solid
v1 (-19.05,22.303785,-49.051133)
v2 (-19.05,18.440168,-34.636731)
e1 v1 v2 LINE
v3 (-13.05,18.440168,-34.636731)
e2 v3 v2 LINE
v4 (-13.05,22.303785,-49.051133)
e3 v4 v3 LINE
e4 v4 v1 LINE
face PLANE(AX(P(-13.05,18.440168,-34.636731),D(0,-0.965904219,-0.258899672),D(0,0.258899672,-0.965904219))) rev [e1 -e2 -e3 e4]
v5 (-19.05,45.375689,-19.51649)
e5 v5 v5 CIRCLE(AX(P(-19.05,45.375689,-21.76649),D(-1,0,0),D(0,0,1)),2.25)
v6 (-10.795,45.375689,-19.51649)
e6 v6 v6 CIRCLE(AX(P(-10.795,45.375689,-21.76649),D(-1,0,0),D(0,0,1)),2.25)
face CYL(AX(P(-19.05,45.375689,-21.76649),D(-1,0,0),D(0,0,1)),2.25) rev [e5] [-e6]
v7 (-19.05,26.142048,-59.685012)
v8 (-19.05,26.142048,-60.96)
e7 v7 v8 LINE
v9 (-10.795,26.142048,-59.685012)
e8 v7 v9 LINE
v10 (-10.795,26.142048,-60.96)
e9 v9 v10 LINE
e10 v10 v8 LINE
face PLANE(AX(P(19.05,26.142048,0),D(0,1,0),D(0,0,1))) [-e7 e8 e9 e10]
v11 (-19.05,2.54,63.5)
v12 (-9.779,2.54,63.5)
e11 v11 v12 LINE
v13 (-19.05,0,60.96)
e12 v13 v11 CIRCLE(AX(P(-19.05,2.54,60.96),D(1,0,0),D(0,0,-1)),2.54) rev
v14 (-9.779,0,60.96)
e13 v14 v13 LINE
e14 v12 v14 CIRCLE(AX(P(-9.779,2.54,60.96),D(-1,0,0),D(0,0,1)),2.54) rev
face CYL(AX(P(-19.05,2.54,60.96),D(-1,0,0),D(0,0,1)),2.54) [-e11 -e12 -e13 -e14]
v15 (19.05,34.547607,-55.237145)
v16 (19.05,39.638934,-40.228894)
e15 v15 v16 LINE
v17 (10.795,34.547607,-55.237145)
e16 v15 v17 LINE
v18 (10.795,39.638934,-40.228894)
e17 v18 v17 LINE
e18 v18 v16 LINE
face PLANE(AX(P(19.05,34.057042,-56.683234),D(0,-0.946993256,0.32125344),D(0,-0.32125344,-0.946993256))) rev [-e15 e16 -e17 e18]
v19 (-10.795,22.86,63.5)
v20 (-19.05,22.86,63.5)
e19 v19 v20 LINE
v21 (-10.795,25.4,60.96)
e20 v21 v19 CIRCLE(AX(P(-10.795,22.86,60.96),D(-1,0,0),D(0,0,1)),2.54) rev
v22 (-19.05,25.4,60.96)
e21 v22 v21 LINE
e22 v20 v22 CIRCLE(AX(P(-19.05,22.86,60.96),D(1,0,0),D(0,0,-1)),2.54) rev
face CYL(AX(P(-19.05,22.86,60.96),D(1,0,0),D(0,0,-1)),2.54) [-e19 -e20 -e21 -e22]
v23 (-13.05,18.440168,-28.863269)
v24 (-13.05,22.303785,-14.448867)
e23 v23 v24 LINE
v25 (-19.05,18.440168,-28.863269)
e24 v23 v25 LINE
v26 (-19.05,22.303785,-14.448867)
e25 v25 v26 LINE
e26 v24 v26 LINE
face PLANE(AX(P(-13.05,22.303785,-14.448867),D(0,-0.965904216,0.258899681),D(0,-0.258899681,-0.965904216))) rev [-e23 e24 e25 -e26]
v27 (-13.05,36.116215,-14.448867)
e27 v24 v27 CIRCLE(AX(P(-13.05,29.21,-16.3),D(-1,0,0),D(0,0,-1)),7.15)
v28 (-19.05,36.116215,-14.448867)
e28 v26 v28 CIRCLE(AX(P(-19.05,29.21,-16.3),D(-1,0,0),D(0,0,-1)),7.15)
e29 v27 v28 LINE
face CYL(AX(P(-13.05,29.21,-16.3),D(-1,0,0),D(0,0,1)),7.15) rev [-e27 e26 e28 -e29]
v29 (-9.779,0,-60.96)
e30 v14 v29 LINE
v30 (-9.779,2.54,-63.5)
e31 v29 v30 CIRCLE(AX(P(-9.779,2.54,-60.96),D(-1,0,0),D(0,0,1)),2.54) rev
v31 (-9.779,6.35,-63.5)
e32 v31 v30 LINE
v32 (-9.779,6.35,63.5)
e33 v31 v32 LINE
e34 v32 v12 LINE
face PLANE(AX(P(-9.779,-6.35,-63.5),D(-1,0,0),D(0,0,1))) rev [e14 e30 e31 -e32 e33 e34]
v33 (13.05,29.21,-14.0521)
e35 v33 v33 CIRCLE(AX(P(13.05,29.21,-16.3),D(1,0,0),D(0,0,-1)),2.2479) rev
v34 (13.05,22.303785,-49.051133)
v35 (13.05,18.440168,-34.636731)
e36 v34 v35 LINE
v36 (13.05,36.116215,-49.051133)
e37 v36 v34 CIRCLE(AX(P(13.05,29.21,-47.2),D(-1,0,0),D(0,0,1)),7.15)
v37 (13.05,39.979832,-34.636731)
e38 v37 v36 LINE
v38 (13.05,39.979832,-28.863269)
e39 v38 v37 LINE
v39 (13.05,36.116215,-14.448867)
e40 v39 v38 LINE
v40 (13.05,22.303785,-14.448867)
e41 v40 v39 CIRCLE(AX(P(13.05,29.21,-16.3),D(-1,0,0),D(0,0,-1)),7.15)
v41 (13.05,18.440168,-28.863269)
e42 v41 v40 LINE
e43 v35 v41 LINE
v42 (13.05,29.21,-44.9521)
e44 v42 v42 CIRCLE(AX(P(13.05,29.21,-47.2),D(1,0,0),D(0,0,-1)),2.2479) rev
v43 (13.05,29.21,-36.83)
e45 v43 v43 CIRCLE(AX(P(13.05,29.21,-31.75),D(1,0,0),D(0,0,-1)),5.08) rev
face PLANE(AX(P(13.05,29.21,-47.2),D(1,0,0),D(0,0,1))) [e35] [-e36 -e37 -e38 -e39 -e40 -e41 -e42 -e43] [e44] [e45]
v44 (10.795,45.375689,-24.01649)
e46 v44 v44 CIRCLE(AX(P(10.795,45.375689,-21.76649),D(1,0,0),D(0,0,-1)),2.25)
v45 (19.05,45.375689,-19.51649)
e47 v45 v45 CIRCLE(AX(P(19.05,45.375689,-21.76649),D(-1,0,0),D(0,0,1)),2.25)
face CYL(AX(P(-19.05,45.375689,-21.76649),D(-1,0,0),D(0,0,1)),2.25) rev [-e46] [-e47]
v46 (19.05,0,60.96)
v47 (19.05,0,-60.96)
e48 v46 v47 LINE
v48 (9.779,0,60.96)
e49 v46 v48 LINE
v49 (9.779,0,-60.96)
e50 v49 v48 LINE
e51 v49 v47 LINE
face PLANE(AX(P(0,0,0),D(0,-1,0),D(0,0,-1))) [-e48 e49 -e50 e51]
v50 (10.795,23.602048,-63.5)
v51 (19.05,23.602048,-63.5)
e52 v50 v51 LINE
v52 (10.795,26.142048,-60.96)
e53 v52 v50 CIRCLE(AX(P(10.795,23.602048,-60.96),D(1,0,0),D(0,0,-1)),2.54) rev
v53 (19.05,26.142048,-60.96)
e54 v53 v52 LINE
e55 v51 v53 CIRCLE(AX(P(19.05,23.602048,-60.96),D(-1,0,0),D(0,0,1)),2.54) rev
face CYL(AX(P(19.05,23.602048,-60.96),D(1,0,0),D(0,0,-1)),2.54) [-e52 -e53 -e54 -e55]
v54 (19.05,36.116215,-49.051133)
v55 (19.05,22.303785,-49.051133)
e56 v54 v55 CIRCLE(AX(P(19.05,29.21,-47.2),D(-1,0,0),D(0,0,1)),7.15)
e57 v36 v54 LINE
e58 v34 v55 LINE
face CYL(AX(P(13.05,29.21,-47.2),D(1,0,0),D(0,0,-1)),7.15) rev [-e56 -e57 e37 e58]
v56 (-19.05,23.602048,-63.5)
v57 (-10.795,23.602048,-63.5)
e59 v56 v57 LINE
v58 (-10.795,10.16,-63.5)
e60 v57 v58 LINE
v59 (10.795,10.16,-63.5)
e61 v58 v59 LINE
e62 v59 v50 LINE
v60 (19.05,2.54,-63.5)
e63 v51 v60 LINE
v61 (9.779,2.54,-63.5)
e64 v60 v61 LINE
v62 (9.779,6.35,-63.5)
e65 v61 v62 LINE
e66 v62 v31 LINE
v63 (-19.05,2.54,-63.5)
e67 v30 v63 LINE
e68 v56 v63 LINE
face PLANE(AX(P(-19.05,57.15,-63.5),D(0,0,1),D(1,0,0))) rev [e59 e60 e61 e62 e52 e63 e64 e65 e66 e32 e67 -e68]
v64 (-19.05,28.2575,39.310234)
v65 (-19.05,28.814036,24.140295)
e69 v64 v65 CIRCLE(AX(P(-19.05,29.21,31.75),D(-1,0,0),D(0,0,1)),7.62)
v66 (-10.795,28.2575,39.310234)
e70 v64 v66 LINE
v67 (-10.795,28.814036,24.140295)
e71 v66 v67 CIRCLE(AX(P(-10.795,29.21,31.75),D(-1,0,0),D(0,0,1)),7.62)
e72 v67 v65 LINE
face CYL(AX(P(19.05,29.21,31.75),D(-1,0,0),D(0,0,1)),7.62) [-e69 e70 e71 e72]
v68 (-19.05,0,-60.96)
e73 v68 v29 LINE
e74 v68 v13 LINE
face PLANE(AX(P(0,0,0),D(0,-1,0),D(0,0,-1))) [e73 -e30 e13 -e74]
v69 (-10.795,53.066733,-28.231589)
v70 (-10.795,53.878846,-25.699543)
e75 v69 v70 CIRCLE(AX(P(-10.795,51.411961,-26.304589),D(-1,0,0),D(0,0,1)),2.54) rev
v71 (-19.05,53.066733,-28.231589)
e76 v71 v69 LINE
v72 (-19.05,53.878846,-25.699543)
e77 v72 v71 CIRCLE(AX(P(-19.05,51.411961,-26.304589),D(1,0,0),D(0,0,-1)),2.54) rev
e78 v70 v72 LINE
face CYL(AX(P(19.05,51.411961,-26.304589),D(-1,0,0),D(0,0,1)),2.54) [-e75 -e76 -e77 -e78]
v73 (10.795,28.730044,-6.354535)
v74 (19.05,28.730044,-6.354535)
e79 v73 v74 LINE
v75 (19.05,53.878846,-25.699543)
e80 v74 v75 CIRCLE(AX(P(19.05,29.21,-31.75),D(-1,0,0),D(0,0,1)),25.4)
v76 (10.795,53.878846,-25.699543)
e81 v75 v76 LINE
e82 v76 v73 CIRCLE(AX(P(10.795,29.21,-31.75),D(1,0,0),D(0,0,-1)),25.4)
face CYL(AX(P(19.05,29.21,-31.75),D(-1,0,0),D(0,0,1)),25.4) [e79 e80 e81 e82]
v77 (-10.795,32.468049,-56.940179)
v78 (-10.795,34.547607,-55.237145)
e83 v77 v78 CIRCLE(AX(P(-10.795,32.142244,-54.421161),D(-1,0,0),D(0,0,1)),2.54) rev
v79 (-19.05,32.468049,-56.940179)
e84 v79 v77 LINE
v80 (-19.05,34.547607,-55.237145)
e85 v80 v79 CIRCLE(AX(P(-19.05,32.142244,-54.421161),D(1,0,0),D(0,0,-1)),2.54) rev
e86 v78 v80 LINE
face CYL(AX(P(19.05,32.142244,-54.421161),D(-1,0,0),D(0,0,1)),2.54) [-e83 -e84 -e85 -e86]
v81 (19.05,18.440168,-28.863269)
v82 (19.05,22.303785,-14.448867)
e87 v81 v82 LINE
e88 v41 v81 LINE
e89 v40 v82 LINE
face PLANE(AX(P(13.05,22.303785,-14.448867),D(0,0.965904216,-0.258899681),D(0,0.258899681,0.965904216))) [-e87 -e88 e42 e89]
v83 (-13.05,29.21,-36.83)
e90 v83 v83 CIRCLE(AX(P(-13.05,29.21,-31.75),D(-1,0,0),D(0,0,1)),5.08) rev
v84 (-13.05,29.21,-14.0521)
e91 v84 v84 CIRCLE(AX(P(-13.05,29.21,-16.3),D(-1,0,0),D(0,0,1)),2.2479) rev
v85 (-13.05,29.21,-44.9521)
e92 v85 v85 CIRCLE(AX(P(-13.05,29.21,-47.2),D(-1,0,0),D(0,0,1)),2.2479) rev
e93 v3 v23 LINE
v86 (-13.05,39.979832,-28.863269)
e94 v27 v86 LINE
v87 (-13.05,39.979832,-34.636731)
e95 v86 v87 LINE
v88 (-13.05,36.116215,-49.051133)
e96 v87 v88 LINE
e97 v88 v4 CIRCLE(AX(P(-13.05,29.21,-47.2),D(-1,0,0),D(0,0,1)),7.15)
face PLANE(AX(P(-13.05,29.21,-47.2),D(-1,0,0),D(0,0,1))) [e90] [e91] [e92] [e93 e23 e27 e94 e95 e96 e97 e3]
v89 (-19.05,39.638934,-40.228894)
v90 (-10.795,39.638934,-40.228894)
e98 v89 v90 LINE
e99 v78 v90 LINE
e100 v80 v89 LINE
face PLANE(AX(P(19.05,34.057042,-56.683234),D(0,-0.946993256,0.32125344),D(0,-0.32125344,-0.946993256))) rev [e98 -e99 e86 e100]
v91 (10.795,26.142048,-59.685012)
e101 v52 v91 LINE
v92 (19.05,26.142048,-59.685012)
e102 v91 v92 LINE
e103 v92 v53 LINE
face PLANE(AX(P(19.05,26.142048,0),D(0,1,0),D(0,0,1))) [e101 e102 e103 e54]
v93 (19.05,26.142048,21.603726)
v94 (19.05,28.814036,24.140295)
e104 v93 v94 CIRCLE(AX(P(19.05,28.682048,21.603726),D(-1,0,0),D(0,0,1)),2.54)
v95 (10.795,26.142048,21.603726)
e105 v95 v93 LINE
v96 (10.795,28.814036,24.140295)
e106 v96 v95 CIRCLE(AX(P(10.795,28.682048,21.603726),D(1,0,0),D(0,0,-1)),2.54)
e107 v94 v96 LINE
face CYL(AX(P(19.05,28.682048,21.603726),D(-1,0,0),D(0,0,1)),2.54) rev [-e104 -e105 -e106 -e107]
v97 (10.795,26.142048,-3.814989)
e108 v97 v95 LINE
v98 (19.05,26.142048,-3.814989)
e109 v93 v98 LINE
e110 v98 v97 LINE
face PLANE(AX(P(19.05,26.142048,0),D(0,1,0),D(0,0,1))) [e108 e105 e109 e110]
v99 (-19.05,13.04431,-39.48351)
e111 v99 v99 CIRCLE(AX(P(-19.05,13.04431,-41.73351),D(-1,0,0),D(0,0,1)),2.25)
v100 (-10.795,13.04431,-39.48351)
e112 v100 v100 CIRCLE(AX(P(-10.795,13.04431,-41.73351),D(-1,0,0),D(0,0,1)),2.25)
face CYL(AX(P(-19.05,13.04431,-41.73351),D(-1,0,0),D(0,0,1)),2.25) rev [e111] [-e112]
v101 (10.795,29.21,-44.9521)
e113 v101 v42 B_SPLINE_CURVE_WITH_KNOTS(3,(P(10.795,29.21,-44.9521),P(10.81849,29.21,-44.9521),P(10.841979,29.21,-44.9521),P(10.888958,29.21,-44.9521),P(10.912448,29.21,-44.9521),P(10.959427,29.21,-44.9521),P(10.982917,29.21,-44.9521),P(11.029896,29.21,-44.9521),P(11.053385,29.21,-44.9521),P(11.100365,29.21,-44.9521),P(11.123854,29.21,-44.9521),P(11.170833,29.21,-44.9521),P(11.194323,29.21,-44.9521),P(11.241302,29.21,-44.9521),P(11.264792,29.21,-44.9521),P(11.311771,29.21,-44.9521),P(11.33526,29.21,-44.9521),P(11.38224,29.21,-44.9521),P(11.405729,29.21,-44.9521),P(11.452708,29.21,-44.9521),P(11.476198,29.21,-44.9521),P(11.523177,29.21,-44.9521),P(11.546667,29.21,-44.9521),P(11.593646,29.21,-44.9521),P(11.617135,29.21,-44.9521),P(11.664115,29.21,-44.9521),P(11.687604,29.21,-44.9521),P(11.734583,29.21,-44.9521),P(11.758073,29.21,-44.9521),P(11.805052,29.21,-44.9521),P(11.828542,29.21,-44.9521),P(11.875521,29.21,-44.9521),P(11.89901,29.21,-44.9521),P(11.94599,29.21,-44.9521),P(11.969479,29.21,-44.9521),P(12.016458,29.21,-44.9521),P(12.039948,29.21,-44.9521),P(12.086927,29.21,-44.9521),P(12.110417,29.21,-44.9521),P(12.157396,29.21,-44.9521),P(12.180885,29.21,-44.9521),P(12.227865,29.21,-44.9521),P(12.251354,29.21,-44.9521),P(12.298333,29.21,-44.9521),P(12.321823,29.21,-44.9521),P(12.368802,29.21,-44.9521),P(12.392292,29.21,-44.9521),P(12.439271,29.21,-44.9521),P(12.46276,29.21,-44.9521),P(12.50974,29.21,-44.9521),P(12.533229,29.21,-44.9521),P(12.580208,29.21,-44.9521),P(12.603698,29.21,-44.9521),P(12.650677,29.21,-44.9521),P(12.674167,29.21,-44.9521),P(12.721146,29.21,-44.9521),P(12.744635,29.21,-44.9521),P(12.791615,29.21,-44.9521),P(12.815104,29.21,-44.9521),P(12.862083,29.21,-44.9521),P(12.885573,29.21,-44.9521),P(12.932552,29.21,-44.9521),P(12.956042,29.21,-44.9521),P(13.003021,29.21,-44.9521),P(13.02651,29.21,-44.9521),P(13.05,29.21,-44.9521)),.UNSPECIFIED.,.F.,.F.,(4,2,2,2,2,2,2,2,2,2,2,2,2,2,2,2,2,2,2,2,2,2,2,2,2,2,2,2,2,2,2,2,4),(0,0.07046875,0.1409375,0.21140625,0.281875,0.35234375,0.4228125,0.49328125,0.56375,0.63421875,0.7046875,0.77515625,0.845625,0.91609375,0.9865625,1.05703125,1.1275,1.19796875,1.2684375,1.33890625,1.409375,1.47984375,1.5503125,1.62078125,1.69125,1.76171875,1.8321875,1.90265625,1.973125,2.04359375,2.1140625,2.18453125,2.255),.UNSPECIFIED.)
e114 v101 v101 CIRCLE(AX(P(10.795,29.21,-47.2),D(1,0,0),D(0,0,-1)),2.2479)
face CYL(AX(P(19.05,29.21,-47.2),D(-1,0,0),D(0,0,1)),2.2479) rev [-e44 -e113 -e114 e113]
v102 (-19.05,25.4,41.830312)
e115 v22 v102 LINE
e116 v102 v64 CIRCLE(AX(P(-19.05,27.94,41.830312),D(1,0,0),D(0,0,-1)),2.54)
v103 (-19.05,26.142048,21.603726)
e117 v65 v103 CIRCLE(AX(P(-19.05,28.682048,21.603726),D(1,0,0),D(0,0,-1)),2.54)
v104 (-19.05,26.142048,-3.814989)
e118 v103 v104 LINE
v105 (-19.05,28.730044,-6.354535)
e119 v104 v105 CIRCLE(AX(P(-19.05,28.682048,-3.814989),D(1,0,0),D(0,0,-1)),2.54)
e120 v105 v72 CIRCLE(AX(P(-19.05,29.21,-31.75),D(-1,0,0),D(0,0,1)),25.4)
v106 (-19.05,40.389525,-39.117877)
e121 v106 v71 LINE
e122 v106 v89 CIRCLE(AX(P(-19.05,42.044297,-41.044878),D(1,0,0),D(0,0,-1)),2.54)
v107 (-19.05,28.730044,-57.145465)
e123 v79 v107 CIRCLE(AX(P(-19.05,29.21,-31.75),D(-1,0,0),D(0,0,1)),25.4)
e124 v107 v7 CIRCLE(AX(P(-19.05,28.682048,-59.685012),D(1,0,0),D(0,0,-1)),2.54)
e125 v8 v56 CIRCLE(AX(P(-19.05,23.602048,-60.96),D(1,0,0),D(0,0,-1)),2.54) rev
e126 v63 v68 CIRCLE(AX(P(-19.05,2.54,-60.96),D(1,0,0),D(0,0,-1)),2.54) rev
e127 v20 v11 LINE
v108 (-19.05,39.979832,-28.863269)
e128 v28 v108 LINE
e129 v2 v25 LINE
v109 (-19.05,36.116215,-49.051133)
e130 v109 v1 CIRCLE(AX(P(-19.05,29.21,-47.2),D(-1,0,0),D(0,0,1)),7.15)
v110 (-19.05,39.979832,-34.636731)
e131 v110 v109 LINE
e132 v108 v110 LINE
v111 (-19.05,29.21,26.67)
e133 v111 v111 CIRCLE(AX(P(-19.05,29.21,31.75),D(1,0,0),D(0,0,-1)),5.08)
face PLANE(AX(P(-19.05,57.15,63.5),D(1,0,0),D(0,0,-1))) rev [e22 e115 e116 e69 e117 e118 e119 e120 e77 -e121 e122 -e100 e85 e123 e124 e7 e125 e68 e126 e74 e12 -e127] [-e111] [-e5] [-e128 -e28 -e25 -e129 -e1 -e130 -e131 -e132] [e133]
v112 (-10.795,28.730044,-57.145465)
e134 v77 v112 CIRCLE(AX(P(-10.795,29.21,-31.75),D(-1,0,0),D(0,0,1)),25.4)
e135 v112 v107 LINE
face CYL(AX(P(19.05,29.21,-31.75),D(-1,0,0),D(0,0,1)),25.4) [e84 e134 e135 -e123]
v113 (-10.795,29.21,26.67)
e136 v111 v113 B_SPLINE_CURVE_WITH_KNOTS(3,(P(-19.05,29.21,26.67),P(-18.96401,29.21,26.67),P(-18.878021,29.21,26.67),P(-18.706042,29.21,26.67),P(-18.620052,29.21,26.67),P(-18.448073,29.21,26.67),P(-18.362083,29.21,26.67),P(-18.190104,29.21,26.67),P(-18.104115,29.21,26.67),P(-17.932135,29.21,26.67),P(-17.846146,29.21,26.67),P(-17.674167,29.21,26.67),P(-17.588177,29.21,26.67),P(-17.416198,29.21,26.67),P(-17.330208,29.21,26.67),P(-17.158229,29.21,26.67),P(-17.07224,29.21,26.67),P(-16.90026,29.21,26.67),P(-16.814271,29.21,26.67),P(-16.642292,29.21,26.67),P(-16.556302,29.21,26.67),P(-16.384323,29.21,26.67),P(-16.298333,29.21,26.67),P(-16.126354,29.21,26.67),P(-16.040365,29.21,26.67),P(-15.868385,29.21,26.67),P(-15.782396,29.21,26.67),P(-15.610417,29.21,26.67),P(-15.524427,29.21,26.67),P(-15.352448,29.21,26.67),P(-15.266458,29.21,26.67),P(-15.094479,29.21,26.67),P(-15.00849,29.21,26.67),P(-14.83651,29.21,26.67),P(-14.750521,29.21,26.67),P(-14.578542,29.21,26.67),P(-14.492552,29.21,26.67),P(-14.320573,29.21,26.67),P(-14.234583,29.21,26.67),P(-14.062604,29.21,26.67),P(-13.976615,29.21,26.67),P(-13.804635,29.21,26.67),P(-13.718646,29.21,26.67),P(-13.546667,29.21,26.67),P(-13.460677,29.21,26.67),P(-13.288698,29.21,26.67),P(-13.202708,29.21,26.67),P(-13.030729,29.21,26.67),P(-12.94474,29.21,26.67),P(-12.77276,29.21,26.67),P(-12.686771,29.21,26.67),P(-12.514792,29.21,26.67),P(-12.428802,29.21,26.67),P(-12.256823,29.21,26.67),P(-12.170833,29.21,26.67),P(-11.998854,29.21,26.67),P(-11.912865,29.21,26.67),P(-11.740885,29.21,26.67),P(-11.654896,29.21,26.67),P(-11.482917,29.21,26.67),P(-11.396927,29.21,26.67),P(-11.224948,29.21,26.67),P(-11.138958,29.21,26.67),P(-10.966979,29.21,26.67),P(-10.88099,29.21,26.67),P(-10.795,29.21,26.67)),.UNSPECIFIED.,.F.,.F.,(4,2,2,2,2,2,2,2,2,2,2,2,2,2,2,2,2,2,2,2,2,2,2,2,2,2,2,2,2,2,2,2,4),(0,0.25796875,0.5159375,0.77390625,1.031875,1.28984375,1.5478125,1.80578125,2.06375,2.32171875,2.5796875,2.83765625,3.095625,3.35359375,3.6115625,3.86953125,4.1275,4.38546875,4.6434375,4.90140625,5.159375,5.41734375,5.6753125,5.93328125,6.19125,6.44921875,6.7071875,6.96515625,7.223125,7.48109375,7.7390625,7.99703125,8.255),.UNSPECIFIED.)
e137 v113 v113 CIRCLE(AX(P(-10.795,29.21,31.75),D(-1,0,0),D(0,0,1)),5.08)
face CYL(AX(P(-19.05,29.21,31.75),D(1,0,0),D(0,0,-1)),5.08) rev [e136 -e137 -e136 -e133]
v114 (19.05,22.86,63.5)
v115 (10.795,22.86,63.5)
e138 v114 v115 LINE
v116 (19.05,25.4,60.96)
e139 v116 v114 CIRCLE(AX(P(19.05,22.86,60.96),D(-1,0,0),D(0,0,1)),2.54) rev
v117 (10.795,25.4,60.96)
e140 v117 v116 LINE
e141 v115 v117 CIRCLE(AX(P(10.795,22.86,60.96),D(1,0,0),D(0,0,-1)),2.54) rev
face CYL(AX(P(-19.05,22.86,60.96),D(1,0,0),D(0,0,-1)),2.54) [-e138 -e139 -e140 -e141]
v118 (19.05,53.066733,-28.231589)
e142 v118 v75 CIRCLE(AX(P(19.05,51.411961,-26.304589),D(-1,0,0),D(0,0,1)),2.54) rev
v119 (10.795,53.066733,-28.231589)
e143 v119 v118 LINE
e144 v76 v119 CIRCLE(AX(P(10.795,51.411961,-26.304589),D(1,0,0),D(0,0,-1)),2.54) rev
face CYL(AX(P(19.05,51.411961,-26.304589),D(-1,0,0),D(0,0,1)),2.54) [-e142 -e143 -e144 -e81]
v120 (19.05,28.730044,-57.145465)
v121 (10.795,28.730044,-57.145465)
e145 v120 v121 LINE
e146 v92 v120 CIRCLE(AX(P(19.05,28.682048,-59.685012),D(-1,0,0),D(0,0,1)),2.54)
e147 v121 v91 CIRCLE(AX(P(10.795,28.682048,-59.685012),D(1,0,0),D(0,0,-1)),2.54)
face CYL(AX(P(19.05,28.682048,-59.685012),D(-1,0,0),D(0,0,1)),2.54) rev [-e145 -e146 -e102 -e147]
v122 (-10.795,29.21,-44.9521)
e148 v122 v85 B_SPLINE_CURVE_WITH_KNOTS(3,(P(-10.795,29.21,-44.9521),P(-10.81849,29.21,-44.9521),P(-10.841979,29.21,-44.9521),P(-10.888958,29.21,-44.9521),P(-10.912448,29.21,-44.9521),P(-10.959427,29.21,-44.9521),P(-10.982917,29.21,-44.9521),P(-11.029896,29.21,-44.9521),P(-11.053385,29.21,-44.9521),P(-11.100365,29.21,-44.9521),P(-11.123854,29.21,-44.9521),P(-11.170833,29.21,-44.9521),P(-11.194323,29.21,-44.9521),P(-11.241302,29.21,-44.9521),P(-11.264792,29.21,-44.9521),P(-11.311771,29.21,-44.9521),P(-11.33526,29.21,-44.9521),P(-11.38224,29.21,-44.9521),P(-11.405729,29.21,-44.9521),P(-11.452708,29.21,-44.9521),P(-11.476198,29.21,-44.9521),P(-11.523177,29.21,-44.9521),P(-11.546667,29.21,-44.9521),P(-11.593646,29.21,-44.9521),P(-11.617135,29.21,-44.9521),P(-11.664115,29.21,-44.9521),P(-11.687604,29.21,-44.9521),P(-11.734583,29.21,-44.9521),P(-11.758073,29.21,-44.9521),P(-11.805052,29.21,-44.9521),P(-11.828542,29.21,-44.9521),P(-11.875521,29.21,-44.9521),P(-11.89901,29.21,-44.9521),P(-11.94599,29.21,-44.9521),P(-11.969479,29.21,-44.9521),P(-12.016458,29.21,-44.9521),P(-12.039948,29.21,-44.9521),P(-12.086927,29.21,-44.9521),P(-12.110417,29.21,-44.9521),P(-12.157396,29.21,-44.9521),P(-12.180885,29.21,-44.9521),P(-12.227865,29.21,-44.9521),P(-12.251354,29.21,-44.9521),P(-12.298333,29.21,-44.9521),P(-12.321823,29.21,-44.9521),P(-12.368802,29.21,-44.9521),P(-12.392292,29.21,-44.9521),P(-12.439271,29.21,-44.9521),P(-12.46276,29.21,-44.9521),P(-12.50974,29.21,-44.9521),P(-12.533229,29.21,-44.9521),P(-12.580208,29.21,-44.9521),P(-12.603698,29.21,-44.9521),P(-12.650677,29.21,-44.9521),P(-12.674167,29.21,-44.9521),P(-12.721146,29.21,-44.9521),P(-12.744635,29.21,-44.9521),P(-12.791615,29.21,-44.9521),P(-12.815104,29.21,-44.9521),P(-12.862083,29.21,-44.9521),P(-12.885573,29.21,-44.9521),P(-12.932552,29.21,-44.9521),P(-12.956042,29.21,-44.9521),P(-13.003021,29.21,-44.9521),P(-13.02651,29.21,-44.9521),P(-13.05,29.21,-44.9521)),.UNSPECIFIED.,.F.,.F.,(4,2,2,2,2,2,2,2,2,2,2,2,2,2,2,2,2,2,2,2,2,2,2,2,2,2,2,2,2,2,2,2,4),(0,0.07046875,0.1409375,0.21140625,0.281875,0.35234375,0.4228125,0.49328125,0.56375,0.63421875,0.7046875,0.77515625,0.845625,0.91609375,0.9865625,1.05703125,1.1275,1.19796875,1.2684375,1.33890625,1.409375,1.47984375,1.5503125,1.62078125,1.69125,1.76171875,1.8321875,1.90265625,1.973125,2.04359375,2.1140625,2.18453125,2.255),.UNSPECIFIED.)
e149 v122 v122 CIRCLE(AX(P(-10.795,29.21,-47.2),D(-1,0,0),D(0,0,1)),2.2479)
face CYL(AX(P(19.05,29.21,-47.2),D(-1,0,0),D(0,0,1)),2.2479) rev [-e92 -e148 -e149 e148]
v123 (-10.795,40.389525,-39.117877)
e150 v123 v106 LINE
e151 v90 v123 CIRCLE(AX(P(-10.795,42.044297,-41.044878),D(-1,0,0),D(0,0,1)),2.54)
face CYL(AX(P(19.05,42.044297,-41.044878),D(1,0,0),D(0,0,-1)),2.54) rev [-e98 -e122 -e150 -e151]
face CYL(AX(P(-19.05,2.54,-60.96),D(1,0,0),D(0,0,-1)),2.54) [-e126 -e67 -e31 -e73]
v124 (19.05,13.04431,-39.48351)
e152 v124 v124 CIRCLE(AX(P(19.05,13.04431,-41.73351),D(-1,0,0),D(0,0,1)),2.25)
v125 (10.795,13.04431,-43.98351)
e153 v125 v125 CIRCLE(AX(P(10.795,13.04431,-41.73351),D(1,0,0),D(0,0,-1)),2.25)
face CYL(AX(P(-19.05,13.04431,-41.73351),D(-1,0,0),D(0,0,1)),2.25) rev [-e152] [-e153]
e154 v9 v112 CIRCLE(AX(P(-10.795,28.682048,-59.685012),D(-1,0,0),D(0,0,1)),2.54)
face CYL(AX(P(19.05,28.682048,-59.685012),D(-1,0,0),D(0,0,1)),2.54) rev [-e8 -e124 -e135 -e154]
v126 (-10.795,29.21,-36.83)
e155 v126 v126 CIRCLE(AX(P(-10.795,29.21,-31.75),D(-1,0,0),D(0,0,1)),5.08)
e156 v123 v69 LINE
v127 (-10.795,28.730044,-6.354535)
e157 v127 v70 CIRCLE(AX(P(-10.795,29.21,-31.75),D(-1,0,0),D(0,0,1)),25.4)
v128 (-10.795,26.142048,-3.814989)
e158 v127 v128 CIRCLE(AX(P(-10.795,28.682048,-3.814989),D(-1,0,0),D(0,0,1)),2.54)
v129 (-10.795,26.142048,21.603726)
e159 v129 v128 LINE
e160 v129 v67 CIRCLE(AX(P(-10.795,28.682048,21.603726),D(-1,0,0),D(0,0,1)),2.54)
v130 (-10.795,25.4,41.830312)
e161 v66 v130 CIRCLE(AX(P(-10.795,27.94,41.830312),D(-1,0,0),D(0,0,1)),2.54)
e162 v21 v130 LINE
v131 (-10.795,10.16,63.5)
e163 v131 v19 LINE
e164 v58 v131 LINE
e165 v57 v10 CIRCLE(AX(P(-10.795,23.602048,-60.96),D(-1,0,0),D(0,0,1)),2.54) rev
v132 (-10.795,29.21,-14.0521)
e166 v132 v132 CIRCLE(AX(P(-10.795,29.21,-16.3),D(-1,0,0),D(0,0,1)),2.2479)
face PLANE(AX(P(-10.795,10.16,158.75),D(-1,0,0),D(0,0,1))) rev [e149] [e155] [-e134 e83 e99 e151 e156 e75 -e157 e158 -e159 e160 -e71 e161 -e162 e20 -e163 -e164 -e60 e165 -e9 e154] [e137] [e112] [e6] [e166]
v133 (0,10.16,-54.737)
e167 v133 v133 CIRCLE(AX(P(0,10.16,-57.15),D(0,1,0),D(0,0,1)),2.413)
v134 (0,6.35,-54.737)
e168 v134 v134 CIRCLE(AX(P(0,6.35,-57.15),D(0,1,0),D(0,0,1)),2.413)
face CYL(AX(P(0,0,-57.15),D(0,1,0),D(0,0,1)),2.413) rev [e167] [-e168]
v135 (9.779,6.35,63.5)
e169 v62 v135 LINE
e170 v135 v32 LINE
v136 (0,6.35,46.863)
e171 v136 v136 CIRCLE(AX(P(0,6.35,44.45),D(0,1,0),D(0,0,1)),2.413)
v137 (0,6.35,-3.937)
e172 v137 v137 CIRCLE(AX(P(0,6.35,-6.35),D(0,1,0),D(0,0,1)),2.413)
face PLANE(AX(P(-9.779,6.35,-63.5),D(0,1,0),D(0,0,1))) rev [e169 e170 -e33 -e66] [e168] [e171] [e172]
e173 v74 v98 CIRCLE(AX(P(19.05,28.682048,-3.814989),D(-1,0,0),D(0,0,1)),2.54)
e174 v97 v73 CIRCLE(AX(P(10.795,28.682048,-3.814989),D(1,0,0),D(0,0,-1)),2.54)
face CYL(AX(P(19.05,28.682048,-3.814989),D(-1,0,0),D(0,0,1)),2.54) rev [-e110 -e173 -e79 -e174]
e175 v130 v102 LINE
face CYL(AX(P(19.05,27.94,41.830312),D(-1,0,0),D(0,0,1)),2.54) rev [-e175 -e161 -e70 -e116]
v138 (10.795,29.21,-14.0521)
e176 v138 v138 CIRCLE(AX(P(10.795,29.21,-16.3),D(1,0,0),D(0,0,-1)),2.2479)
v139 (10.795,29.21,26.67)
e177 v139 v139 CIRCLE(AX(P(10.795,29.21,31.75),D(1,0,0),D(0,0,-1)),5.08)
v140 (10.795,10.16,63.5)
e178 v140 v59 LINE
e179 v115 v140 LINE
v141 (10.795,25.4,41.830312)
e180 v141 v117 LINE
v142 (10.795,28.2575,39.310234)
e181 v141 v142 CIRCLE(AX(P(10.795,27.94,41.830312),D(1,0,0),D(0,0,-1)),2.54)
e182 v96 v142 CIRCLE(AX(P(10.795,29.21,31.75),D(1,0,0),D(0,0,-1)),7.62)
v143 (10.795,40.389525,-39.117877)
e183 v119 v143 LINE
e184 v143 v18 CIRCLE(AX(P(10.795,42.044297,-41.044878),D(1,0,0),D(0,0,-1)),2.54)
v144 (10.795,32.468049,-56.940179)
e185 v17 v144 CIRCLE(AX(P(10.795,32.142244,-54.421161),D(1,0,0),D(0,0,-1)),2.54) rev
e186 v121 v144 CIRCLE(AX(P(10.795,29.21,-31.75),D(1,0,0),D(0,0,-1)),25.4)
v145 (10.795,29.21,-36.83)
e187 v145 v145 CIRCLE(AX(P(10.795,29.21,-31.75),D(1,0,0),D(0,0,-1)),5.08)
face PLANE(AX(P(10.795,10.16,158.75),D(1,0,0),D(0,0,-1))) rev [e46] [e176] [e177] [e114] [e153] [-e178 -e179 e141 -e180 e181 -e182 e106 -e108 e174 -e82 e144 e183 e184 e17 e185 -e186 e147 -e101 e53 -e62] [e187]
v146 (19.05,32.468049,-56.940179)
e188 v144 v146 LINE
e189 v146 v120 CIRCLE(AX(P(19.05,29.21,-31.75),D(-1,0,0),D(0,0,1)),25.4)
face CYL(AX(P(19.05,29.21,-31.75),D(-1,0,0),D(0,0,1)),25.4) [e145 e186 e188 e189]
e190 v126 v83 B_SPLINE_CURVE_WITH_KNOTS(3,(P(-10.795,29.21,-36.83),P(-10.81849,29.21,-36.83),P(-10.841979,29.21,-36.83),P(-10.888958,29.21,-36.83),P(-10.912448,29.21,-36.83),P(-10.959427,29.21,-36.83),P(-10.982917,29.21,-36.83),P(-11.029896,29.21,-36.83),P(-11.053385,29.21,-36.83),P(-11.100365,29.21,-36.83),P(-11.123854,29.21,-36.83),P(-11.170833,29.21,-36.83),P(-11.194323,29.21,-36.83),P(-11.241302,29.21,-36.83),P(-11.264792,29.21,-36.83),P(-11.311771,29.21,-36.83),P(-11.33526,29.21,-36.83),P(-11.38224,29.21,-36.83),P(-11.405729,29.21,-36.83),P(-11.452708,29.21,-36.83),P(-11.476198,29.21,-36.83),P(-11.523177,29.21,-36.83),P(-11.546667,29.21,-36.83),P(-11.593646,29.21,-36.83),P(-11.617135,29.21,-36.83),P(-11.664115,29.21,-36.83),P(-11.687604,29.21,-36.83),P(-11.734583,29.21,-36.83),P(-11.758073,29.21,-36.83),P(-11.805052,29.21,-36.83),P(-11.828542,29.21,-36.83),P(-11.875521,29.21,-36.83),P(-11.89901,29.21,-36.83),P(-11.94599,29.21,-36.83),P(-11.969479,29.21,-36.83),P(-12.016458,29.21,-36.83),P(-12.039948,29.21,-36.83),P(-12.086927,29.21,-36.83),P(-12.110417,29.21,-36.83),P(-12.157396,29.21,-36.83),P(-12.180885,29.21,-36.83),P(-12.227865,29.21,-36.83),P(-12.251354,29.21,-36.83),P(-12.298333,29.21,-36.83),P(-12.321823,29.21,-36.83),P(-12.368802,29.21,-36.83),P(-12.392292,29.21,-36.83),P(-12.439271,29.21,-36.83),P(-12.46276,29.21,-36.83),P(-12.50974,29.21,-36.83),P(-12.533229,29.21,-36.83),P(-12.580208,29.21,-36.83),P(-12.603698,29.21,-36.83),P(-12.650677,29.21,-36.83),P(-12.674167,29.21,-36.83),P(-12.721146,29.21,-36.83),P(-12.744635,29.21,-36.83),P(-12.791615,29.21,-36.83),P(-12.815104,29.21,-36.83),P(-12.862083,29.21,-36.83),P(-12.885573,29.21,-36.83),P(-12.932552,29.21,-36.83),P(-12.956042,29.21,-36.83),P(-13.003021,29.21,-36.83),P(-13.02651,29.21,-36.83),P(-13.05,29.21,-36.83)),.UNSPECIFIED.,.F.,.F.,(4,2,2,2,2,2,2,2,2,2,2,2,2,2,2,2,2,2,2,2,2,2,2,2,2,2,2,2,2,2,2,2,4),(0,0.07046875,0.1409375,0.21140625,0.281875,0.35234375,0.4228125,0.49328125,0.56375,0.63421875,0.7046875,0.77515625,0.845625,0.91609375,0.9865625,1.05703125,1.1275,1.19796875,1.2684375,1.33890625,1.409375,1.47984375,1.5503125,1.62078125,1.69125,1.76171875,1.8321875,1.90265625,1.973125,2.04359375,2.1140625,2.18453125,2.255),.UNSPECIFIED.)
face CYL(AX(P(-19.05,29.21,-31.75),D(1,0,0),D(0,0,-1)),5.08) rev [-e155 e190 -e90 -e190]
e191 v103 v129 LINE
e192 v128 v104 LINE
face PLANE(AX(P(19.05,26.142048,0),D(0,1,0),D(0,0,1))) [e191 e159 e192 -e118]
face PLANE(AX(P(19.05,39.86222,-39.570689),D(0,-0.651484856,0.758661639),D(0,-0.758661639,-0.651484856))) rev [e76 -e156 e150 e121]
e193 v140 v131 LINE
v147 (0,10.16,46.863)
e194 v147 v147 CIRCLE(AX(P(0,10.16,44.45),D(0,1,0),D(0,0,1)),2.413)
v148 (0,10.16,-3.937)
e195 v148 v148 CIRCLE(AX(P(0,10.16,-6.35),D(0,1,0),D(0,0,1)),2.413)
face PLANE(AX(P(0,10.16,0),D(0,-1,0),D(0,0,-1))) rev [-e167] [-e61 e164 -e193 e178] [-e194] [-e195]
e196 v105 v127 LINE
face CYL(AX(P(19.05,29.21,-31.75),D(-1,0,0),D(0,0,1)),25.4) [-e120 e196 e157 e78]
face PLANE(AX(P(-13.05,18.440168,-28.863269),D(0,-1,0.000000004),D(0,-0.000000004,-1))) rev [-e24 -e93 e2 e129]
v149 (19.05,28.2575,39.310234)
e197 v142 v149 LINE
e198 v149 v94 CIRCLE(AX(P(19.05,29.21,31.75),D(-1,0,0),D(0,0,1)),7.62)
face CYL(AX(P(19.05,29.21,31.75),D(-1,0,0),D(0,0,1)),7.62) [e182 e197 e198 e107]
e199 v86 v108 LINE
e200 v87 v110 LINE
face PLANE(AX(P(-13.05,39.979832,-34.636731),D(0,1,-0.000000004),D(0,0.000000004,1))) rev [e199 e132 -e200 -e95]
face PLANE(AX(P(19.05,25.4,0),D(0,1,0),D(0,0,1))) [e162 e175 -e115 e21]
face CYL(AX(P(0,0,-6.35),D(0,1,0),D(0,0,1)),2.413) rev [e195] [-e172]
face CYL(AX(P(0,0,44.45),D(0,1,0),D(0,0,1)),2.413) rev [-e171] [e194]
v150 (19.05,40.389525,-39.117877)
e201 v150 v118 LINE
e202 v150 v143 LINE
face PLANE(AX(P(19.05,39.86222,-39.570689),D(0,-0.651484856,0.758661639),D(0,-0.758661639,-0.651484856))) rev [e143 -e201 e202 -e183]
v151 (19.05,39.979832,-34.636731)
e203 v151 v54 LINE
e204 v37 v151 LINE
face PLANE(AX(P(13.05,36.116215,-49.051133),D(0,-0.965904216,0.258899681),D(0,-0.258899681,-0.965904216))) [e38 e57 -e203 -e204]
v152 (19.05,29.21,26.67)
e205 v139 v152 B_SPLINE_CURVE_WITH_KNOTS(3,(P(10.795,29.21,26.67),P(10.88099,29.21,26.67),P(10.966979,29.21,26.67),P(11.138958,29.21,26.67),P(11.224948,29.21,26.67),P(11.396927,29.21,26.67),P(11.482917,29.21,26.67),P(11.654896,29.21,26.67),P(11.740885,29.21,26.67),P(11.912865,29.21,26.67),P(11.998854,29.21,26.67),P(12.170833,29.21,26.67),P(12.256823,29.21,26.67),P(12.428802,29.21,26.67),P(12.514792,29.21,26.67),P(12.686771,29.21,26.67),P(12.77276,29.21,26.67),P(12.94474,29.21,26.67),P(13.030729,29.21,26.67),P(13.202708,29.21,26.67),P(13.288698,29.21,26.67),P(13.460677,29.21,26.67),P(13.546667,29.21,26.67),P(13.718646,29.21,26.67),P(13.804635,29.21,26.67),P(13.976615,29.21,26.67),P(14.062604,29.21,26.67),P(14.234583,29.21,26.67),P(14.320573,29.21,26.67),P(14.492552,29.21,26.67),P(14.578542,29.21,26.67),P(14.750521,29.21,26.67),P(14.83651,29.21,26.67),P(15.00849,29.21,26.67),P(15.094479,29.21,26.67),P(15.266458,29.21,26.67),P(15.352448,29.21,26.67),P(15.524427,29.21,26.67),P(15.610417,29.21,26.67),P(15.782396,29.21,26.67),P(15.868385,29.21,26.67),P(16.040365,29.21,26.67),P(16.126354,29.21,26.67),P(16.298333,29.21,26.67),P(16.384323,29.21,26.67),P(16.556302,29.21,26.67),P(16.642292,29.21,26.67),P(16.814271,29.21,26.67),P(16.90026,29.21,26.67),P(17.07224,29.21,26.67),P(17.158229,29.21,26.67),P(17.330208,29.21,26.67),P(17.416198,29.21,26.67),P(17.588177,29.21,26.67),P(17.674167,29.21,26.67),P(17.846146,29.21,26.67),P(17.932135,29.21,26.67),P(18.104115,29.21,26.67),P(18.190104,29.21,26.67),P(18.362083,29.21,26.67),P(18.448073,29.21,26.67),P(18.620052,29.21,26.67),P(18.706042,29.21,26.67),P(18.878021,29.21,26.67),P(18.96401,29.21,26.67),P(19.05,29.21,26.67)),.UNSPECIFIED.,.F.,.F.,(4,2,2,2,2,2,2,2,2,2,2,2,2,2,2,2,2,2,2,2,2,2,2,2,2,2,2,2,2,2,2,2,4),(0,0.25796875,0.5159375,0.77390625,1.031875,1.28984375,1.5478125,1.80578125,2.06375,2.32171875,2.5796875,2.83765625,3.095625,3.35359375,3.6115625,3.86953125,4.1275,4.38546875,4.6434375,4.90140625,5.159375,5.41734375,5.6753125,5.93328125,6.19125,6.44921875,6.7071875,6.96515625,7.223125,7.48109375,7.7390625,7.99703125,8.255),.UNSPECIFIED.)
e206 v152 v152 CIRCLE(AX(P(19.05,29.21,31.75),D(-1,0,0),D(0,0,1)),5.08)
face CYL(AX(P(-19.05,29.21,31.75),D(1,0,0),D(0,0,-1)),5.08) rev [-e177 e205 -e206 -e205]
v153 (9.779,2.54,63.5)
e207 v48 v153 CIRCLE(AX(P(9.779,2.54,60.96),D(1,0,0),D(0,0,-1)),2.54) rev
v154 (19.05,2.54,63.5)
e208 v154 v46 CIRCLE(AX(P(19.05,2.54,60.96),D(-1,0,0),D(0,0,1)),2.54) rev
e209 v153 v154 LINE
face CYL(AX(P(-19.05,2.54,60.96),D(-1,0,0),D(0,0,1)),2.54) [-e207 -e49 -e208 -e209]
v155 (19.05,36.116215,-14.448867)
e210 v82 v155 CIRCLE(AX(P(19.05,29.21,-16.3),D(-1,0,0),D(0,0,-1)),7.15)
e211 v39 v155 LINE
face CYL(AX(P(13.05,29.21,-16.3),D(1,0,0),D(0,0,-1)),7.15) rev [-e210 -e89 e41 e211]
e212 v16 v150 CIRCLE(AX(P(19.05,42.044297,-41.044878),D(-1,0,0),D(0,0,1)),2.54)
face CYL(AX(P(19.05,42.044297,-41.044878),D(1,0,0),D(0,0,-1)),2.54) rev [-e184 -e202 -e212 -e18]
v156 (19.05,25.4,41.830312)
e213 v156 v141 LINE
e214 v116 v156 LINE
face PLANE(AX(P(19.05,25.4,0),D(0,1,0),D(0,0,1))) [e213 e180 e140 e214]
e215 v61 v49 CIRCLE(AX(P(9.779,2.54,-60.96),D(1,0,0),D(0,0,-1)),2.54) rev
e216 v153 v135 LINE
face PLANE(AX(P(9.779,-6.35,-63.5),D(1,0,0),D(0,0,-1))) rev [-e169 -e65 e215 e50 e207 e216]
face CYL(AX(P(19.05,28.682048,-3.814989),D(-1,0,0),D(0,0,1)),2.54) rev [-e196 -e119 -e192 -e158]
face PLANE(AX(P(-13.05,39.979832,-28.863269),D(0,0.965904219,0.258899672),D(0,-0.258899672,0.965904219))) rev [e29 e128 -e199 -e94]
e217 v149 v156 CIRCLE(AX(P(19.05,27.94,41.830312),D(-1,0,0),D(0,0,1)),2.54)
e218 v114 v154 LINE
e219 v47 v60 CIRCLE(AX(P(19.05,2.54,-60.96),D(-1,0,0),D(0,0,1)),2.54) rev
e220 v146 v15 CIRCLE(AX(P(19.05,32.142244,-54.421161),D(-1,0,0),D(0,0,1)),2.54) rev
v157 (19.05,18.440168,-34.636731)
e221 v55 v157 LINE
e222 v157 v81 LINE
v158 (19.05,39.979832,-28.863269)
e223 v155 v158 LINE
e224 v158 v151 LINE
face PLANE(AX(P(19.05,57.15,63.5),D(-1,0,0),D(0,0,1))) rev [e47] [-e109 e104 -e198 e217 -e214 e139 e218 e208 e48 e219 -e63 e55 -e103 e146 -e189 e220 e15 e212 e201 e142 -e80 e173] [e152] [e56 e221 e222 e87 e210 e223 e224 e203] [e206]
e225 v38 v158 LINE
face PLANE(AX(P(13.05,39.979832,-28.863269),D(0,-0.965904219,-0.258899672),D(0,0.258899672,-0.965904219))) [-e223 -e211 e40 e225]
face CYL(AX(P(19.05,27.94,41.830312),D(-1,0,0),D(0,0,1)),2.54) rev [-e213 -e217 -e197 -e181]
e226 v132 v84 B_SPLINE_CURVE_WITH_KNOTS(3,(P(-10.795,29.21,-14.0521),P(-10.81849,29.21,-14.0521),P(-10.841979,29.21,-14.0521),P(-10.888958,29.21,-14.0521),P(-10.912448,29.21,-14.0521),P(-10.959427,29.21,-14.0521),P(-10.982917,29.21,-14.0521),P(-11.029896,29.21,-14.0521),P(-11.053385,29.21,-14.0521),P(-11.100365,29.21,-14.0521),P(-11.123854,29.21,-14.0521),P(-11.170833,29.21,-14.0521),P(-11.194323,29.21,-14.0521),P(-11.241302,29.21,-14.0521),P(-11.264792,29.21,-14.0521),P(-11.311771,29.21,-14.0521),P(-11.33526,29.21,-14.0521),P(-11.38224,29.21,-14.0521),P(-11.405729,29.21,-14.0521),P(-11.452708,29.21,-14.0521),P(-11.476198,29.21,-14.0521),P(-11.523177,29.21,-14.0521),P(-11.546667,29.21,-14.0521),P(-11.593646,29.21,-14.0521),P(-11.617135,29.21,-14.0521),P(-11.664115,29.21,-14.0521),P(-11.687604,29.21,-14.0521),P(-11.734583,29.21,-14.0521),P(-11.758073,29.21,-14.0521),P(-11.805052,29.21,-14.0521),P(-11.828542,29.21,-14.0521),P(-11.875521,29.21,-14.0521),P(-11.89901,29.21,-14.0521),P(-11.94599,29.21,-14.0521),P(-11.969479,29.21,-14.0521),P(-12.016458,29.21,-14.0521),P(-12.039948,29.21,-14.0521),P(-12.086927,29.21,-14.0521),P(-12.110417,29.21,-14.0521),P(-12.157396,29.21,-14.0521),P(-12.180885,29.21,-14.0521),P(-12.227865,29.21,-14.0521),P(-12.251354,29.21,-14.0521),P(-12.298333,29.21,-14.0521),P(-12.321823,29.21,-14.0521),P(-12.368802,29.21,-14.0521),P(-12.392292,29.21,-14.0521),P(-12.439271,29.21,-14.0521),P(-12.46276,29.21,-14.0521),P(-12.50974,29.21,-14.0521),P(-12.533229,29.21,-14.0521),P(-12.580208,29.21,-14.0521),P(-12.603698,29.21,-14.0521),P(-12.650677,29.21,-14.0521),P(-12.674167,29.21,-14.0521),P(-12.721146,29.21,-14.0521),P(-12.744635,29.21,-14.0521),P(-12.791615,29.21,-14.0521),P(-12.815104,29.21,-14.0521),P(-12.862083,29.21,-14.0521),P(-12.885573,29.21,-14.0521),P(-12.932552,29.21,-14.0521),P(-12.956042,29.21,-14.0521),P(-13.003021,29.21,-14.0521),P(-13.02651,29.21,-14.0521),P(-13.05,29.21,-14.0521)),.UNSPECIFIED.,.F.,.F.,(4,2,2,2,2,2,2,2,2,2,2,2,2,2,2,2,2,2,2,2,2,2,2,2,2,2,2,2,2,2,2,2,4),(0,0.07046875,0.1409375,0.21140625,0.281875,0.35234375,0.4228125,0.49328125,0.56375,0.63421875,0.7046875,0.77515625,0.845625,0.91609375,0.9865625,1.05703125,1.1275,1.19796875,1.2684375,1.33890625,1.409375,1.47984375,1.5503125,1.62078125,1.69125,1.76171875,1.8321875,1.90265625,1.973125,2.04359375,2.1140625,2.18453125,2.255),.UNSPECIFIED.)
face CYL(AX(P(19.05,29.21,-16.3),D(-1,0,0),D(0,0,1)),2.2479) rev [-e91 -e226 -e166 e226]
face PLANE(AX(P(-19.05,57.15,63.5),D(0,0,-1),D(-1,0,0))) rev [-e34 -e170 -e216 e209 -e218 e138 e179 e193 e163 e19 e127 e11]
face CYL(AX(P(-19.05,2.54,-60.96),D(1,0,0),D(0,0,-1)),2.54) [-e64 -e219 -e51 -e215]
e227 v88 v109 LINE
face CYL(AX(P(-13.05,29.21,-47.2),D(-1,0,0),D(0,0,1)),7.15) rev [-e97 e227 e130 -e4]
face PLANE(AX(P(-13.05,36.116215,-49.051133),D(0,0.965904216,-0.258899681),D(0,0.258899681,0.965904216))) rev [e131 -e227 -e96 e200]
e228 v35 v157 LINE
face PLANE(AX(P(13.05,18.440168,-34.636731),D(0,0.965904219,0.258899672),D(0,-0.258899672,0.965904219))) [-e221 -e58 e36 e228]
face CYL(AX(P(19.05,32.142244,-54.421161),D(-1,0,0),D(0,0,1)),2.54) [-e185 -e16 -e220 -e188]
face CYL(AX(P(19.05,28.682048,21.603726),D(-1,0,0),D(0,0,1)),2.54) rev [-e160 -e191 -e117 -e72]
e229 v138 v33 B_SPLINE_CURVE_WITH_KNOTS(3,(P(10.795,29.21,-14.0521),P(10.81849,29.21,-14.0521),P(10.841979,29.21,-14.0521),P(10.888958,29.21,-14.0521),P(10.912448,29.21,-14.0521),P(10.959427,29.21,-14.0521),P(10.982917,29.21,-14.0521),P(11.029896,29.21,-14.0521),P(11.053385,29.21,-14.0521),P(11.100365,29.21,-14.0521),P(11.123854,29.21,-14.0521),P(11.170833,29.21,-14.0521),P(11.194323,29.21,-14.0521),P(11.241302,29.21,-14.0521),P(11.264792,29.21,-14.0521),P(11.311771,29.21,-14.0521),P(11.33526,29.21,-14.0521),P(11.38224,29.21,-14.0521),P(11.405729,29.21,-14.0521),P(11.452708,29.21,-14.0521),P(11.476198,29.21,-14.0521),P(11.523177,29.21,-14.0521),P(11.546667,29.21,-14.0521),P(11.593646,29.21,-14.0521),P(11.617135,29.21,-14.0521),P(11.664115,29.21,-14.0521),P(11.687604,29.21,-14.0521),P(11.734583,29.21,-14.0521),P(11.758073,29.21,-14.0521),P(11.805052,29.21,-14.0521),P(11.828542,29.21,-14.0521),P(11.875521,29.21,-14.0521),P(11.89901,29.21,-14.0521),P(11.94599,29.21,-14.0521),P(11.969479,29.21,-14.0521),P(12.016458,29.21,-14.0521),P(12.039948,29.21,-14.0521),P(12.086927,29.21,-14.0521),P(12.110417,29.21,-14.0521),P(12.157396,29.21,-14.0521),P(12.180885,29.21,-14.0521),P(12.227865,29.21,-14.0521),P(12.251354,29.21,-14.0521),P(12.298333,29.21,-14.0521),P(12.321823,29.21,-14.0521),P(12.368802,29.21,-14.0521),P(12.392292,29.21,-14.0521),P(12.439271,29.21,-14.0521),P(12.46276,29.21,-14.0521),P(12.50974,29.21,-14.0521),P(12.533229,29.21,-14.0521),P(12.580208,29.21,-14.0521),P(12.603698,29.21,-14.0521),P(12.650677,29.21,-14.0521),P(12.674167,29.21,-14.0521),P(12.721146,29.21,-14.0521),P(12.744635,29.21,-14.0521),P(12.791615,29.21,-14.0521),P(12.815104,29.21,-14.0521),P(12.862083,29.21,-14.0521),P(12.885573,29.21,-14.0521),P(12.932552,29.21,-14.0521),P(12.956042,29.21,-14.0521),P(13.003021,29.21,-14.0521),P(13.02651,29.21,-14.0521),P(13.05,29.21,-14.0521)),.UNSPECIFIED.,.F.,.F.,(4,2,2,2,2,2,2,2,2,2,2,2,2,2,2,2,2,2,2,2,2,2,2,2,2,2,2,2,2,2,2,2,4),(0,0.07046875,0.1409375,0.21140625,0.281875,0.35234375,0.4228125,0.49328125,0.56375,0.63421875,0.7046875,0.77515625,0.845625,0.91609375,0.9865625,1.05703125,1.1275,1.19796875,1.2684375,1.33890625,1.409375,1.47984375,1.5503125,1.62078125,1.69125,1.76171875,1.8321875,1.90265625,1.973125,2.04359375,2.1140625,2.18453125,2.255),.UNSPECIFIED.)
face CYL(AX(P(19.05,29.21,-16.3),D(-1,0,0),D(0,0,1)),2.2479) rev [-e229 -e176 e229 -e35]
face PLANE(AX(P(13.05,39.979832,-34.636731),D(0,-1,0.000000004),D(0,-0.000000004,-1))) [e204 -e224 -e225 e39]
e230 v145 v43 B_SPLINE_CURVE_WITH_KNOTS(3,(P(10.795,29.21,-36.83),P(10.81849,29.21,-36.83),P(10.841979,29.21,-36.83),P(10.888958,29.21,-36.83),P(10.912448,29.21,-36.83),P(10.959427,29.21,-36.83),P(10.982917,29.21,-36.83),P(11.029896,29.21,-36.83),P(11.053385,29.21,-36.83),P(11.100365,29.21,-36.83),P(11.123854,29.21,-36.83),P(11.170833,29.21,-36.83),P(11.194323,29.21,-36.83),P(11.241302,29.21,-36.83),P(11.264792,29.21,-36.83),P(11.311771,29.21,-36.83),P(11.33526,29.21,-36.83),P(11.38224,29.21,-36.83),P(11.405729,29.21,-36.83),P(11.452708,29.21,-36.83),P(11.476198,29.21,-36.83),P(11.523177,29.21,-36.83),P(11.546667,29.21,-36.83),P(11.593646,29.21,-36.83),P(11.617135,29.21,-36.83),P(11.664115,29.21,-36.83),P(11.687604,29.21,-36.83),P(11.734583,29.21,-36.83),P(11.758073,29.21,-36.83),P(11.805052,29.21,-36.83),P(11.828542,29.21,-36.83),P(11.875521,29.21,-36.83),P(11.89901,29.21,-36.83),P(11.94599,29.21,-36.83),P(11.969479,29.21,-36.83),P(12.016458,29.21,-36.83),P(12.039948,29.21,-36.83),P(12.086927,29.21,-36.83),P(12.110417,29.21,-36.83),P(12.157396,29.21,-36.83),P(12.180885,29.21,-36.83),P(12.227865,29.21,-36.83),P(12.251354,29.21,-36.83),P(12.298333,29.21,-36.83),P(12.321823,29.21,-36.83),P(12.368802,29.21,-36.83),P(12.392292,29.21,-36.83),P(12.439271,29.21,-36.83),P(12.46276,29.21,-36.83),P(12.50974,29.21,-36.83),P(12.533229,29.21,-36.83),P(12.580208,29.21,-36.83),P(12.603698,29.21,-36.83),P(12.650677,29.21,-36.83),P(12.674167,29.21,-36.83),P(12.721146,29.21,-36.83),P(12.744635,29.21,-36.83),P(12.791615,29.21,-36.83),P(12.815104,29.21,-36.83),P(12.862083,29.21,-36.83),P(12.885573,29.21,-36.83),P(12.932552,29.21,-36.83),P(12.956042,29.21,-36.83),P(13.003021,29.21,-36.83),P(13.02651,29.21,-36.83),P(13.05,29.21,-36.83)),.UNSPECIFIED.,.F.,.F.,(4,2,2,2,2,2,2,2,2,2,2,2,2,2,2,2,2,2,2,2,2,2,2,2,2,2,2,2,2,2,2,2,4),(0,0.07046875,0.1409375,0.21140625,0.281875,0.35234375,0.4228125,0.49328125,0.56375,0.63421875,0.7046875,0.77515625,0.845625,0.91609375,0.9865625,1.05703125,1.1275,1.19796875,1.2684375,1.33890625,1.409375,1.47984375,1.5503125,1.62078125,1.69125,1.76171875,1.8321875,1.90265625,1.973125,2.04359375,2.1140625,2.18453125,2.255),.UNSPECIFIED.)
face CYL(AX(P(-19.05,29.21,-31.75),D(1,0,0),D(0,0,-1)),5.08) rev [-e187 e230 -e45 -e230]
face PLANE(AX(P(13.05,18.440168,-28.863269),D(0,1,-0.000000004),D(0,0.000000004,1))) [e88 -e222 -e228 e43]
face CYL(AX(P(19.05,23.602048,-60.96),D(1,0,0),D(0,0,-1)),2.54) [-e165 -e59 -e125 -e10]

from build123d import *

# Parameters (mm, degrees)
SKETCH1_W               = 38.1
SKETCH1_H               = 127
BOSS_EXTRUDE1_DEPTH     = 57.15
SKETCH2_W               = 21.59
SKETCH2_H               = 254
CUT_EXTRUDE1_DEPTH      = 46.99
CUT_EXTRUDE2_DEPTH      = 94.541341128
CUT_EXTRUDE2_DEPTH_BACK = 94.541341128
SKETCH3_R               = 5.08
CUT_EXTRUDE8_DEPTH      = 94.541341128
SKETCH12_W              = 19.558
SKETCH12_H              = 12.7
CUT_EXTRUDE9_DEPTH      = 140.549828341
SKETCH13_R              = 2.413
CUT_EXTRUDE10_DEPTH     = 80.81826227
F_3_CLEARANCE_HOLE1_D   = 4.5
SKETCH16_R              = 2.2479
CUT_EXTRUDE11_DEPTH     = 93.011478034
CUT_EXTRUDE13_DEPTH     = 6
CUT_EXTRUDE14_DEPTH     = 93.011478034
FILLET3_R               = 2.54


with BuildPart() as part:
    # Sketch1 → Boss-Extrude1 (new body)
    with BuildSketch(Plane(origin=(0, 0, 0), x_dir=(1, 0, 0), z_dir=(0, 1, 0))):
        Rectangle(SKETCH1_W, SKETCH1_H)
    extrude(amount=BOSS_EXTRUDE1_DEPTH)

    # Sketch2 → Cut-Extrude1 (cut)
    with BuildSketch(Plane(origin=(0, 57.15, 0), x_dir=(1, 0, 0), z_dir=(0, 1, 0))):
        with Locations((0, -31.75)):
            Rectangle(SKETCH2_W, SKETCH2_H)
    extrude(amount=-CUT_EXTRUDE1_DEPTH, mode=Mode.SUBTRACT)

    # Sketch3 → Cut-Extrude2 (cut, two sides: drawn at the far end of the back side and taken through both)
    with BuildSketch(Plane(origin=(19.05, 0, 0), x_dir=(0, 0, -1), z_dir=(1, 0, 0)).offset(-CUT_EXTRUDE2_DEPTH_BACK)):
        with Locations((-31.75, 29.21)):
            Circle(SKETCH3_R)
        with Locations((31.75, 29.21)):
            Circle(SKETCH3_R)
    extrude(amount=CUT_EXTRUDE2_DEPTH + CUT_EXTRUDE2_DEPTH_BACK, mode=Mode.SUBTRACT)

    # Sketch11 → Cut-Extrude8 (cut, through all)
    with BuildSketch(Plane.ZY.offset(19.05)):
        with BuildLine():
            Line((38.349113577, 25.4), (63.5, 25.4))
            Line((63.5, 25.4), (63.5, 57.15))
            Line((63.5, 57.15), (-63.5, 57.15))
            Line((-63.5, 57.15), (-63.5, 26.142048402))
            Line((-63.5, 26.142048402), (-56.964037289, 26.142048402))
            ThreePointArc((-56.964037289, 26.142048402), (-31.750000057, 54.609999908), (-6.535962824, 26.142048402))
            Line((-6.535962824, 26.142048402), (24.774896202, 26.142048402))
            ThreePointArc((24.774896202, 26.142048402), (32.165934032, 36.818639752), (38.349113577, 25.4))
        make_face()
    extrude(amount=-CUT_EXTRUDE8_DEPTH, mode=Mode.SUBTRACT)

    # Sketch12 → Cut-Extrude9 (cut, through all)
    with BuildSketch(Plane.XY.offset(63.5)):
        Rectangle(SKETCH12_W, SKETCH12_H)
    extrude(amount=-CUT_EXTRUDE9_DEPTH, mode=Mode.SUBTRACT)

    # Sketch13 → Cut-Extrude10 (cut, through all)
    with BuildSketch(Plane(origin=(0, 10.16, 0), x_dir=(1, 0, 0), z_dir=(0, 1, 0))):
        with Locations((0, -44.45)):
            Circle(SKETCH13_R)
        with Locations((0, 57.15)):
            Circle(SKETCH13_R)
        with Locations((0, 6.35)):
            Circle(SKETCH13_R)
    extrude(amount=-CUT_EXTRUDE10_DEPTH, mode=Mode.SUBTRACT)

    # #3 Clearance Hole1 (through all)
    with Locations(Plane.ZY.offset(19.05)):
        with Locations((-21.766489637, 45.37568946), (-41.733510476, 13.044310357)):
            Hole(F_3_CLEARANCE_HOLE1_D / 2)

    # Sketch16 → Cut-Extrude11 (cut, through all)
    with BuildSketch(Plane.ZY.offset(19.05)):
        with Locations((-47.200000057, 29.209999908)):
            Circle(SKETCH16_R)
        with Locations((-16.300000057, 29.209999908)):
            Circle(SKETCH16_R)
    extrude(amount=-CUT_EXTRUDE11_DEPTH, mode=Mode.SUBTRACT)

    # Sketch21 → Cut-Extrude13 (cut)
    with BuildSketch(Plane.ZY.offset(19.05)):
        with BuildLine():
            Line((-49.051132759, 36.116215079), (-34.636731482, 39.979832013))
            Line((-34.636731482, 39.979832013), (-28.863268699, 39.979832039))
            Line((-28.863268699, 39.979832039), (-14.448867387, 36.116215233))
            ThreePointArc((-14.448867387, 36.116215233), (-9.150000043, 29.210000101), (-14.448867326, 22.303784921))
            Line((-14.448867326, 22.303784921), (-28.863268603, 18.440167987))
            Line((-28.863268603, 18.440167987), (-34.636731386, 18.440167961))
            Line((-34.636731386, 18.440167961), (-49.051132698, 22.303784767))
            ThreePointArc((-49.051132698, 22.303784767), (-54.350000043, 29.209999899), (-49.051132759, 36.116215079))
        make_face()
    cut_extrude13 = extrude(amount=-CUT_EXTRUDE13_DEPTH, mode=Mode.SUBTRACT)

    # Sketch22 → Cut-Extrude14 (cut, through all)
    with BuildSketch(Plane.ZY.offset(19.05)):
        Polygon((-56.683234461, 34.057042479), (-39.570689377, 39.862220003), (-27.251193914, 54.208414749), (-28.68815775, 55.797566838), (-55.153027555, 53.24322782), (-63.3901932, 32.021075452), align=None)
    extrude(amount=-CUT_EXTRUDE14_DEPTH, mode=Mode.SUBTRACT)

    # Fillet3
    fillet3_edges = [part.edges().sort_by_distance(p)[0] for p in [
        (-14.9225, 25.4, 63.5),
        (14.9225, 25.4, 63.5),
        (-14.4145, 0, 63.5),
        (14.4145, 0, 63.5),
        (14.4145, 0, -63.5),
        (-14.4145, 0, -63.5),
        (-14.9225, 26.142048402, -63.5),
        (14.9225, 26.142048402, -63.5),
        (-14.9225, 26.142048402, -6.535962824),
        (14.9225, 26.142048402, -6.535962824),
        (14.9225, 54.208414749, -27.251193914),
        (-14.9225, 54.208414749, -27.251193914),
        (-14.9225, 39.862220003, -39.570689377),
        (14.9225, 39.862220003, -39.570689377),
        (14.9225, 34.057042479, -56.683234461),
        (-14.9225, 34.057042479, -56.683234461),
        (-14.9225, 26.142048402, -56.964037289),
        (14.9225, 26.142048402, -56.964037289),
        (14.9225, 26.142048402, 24.774896202),
        (14.9225, 25.4, 38.349113577),
        (-14.9225, 25.4, 38.349113577),
        (-14.9225, 26.142048402, 24.774896202),
    ]]
    fillet(fillet3_edges, radius=FILLET3_R)

    # Mirror1: Cut-Extrude13 across plane
    add(cut_extrude13.mirror(Plane(origin=(0, 0, 0), x_dir=(0, 0, 1), z_dir=(1, 0, 0))), mode=Mode.SUBTRACT)


solid = part.part
